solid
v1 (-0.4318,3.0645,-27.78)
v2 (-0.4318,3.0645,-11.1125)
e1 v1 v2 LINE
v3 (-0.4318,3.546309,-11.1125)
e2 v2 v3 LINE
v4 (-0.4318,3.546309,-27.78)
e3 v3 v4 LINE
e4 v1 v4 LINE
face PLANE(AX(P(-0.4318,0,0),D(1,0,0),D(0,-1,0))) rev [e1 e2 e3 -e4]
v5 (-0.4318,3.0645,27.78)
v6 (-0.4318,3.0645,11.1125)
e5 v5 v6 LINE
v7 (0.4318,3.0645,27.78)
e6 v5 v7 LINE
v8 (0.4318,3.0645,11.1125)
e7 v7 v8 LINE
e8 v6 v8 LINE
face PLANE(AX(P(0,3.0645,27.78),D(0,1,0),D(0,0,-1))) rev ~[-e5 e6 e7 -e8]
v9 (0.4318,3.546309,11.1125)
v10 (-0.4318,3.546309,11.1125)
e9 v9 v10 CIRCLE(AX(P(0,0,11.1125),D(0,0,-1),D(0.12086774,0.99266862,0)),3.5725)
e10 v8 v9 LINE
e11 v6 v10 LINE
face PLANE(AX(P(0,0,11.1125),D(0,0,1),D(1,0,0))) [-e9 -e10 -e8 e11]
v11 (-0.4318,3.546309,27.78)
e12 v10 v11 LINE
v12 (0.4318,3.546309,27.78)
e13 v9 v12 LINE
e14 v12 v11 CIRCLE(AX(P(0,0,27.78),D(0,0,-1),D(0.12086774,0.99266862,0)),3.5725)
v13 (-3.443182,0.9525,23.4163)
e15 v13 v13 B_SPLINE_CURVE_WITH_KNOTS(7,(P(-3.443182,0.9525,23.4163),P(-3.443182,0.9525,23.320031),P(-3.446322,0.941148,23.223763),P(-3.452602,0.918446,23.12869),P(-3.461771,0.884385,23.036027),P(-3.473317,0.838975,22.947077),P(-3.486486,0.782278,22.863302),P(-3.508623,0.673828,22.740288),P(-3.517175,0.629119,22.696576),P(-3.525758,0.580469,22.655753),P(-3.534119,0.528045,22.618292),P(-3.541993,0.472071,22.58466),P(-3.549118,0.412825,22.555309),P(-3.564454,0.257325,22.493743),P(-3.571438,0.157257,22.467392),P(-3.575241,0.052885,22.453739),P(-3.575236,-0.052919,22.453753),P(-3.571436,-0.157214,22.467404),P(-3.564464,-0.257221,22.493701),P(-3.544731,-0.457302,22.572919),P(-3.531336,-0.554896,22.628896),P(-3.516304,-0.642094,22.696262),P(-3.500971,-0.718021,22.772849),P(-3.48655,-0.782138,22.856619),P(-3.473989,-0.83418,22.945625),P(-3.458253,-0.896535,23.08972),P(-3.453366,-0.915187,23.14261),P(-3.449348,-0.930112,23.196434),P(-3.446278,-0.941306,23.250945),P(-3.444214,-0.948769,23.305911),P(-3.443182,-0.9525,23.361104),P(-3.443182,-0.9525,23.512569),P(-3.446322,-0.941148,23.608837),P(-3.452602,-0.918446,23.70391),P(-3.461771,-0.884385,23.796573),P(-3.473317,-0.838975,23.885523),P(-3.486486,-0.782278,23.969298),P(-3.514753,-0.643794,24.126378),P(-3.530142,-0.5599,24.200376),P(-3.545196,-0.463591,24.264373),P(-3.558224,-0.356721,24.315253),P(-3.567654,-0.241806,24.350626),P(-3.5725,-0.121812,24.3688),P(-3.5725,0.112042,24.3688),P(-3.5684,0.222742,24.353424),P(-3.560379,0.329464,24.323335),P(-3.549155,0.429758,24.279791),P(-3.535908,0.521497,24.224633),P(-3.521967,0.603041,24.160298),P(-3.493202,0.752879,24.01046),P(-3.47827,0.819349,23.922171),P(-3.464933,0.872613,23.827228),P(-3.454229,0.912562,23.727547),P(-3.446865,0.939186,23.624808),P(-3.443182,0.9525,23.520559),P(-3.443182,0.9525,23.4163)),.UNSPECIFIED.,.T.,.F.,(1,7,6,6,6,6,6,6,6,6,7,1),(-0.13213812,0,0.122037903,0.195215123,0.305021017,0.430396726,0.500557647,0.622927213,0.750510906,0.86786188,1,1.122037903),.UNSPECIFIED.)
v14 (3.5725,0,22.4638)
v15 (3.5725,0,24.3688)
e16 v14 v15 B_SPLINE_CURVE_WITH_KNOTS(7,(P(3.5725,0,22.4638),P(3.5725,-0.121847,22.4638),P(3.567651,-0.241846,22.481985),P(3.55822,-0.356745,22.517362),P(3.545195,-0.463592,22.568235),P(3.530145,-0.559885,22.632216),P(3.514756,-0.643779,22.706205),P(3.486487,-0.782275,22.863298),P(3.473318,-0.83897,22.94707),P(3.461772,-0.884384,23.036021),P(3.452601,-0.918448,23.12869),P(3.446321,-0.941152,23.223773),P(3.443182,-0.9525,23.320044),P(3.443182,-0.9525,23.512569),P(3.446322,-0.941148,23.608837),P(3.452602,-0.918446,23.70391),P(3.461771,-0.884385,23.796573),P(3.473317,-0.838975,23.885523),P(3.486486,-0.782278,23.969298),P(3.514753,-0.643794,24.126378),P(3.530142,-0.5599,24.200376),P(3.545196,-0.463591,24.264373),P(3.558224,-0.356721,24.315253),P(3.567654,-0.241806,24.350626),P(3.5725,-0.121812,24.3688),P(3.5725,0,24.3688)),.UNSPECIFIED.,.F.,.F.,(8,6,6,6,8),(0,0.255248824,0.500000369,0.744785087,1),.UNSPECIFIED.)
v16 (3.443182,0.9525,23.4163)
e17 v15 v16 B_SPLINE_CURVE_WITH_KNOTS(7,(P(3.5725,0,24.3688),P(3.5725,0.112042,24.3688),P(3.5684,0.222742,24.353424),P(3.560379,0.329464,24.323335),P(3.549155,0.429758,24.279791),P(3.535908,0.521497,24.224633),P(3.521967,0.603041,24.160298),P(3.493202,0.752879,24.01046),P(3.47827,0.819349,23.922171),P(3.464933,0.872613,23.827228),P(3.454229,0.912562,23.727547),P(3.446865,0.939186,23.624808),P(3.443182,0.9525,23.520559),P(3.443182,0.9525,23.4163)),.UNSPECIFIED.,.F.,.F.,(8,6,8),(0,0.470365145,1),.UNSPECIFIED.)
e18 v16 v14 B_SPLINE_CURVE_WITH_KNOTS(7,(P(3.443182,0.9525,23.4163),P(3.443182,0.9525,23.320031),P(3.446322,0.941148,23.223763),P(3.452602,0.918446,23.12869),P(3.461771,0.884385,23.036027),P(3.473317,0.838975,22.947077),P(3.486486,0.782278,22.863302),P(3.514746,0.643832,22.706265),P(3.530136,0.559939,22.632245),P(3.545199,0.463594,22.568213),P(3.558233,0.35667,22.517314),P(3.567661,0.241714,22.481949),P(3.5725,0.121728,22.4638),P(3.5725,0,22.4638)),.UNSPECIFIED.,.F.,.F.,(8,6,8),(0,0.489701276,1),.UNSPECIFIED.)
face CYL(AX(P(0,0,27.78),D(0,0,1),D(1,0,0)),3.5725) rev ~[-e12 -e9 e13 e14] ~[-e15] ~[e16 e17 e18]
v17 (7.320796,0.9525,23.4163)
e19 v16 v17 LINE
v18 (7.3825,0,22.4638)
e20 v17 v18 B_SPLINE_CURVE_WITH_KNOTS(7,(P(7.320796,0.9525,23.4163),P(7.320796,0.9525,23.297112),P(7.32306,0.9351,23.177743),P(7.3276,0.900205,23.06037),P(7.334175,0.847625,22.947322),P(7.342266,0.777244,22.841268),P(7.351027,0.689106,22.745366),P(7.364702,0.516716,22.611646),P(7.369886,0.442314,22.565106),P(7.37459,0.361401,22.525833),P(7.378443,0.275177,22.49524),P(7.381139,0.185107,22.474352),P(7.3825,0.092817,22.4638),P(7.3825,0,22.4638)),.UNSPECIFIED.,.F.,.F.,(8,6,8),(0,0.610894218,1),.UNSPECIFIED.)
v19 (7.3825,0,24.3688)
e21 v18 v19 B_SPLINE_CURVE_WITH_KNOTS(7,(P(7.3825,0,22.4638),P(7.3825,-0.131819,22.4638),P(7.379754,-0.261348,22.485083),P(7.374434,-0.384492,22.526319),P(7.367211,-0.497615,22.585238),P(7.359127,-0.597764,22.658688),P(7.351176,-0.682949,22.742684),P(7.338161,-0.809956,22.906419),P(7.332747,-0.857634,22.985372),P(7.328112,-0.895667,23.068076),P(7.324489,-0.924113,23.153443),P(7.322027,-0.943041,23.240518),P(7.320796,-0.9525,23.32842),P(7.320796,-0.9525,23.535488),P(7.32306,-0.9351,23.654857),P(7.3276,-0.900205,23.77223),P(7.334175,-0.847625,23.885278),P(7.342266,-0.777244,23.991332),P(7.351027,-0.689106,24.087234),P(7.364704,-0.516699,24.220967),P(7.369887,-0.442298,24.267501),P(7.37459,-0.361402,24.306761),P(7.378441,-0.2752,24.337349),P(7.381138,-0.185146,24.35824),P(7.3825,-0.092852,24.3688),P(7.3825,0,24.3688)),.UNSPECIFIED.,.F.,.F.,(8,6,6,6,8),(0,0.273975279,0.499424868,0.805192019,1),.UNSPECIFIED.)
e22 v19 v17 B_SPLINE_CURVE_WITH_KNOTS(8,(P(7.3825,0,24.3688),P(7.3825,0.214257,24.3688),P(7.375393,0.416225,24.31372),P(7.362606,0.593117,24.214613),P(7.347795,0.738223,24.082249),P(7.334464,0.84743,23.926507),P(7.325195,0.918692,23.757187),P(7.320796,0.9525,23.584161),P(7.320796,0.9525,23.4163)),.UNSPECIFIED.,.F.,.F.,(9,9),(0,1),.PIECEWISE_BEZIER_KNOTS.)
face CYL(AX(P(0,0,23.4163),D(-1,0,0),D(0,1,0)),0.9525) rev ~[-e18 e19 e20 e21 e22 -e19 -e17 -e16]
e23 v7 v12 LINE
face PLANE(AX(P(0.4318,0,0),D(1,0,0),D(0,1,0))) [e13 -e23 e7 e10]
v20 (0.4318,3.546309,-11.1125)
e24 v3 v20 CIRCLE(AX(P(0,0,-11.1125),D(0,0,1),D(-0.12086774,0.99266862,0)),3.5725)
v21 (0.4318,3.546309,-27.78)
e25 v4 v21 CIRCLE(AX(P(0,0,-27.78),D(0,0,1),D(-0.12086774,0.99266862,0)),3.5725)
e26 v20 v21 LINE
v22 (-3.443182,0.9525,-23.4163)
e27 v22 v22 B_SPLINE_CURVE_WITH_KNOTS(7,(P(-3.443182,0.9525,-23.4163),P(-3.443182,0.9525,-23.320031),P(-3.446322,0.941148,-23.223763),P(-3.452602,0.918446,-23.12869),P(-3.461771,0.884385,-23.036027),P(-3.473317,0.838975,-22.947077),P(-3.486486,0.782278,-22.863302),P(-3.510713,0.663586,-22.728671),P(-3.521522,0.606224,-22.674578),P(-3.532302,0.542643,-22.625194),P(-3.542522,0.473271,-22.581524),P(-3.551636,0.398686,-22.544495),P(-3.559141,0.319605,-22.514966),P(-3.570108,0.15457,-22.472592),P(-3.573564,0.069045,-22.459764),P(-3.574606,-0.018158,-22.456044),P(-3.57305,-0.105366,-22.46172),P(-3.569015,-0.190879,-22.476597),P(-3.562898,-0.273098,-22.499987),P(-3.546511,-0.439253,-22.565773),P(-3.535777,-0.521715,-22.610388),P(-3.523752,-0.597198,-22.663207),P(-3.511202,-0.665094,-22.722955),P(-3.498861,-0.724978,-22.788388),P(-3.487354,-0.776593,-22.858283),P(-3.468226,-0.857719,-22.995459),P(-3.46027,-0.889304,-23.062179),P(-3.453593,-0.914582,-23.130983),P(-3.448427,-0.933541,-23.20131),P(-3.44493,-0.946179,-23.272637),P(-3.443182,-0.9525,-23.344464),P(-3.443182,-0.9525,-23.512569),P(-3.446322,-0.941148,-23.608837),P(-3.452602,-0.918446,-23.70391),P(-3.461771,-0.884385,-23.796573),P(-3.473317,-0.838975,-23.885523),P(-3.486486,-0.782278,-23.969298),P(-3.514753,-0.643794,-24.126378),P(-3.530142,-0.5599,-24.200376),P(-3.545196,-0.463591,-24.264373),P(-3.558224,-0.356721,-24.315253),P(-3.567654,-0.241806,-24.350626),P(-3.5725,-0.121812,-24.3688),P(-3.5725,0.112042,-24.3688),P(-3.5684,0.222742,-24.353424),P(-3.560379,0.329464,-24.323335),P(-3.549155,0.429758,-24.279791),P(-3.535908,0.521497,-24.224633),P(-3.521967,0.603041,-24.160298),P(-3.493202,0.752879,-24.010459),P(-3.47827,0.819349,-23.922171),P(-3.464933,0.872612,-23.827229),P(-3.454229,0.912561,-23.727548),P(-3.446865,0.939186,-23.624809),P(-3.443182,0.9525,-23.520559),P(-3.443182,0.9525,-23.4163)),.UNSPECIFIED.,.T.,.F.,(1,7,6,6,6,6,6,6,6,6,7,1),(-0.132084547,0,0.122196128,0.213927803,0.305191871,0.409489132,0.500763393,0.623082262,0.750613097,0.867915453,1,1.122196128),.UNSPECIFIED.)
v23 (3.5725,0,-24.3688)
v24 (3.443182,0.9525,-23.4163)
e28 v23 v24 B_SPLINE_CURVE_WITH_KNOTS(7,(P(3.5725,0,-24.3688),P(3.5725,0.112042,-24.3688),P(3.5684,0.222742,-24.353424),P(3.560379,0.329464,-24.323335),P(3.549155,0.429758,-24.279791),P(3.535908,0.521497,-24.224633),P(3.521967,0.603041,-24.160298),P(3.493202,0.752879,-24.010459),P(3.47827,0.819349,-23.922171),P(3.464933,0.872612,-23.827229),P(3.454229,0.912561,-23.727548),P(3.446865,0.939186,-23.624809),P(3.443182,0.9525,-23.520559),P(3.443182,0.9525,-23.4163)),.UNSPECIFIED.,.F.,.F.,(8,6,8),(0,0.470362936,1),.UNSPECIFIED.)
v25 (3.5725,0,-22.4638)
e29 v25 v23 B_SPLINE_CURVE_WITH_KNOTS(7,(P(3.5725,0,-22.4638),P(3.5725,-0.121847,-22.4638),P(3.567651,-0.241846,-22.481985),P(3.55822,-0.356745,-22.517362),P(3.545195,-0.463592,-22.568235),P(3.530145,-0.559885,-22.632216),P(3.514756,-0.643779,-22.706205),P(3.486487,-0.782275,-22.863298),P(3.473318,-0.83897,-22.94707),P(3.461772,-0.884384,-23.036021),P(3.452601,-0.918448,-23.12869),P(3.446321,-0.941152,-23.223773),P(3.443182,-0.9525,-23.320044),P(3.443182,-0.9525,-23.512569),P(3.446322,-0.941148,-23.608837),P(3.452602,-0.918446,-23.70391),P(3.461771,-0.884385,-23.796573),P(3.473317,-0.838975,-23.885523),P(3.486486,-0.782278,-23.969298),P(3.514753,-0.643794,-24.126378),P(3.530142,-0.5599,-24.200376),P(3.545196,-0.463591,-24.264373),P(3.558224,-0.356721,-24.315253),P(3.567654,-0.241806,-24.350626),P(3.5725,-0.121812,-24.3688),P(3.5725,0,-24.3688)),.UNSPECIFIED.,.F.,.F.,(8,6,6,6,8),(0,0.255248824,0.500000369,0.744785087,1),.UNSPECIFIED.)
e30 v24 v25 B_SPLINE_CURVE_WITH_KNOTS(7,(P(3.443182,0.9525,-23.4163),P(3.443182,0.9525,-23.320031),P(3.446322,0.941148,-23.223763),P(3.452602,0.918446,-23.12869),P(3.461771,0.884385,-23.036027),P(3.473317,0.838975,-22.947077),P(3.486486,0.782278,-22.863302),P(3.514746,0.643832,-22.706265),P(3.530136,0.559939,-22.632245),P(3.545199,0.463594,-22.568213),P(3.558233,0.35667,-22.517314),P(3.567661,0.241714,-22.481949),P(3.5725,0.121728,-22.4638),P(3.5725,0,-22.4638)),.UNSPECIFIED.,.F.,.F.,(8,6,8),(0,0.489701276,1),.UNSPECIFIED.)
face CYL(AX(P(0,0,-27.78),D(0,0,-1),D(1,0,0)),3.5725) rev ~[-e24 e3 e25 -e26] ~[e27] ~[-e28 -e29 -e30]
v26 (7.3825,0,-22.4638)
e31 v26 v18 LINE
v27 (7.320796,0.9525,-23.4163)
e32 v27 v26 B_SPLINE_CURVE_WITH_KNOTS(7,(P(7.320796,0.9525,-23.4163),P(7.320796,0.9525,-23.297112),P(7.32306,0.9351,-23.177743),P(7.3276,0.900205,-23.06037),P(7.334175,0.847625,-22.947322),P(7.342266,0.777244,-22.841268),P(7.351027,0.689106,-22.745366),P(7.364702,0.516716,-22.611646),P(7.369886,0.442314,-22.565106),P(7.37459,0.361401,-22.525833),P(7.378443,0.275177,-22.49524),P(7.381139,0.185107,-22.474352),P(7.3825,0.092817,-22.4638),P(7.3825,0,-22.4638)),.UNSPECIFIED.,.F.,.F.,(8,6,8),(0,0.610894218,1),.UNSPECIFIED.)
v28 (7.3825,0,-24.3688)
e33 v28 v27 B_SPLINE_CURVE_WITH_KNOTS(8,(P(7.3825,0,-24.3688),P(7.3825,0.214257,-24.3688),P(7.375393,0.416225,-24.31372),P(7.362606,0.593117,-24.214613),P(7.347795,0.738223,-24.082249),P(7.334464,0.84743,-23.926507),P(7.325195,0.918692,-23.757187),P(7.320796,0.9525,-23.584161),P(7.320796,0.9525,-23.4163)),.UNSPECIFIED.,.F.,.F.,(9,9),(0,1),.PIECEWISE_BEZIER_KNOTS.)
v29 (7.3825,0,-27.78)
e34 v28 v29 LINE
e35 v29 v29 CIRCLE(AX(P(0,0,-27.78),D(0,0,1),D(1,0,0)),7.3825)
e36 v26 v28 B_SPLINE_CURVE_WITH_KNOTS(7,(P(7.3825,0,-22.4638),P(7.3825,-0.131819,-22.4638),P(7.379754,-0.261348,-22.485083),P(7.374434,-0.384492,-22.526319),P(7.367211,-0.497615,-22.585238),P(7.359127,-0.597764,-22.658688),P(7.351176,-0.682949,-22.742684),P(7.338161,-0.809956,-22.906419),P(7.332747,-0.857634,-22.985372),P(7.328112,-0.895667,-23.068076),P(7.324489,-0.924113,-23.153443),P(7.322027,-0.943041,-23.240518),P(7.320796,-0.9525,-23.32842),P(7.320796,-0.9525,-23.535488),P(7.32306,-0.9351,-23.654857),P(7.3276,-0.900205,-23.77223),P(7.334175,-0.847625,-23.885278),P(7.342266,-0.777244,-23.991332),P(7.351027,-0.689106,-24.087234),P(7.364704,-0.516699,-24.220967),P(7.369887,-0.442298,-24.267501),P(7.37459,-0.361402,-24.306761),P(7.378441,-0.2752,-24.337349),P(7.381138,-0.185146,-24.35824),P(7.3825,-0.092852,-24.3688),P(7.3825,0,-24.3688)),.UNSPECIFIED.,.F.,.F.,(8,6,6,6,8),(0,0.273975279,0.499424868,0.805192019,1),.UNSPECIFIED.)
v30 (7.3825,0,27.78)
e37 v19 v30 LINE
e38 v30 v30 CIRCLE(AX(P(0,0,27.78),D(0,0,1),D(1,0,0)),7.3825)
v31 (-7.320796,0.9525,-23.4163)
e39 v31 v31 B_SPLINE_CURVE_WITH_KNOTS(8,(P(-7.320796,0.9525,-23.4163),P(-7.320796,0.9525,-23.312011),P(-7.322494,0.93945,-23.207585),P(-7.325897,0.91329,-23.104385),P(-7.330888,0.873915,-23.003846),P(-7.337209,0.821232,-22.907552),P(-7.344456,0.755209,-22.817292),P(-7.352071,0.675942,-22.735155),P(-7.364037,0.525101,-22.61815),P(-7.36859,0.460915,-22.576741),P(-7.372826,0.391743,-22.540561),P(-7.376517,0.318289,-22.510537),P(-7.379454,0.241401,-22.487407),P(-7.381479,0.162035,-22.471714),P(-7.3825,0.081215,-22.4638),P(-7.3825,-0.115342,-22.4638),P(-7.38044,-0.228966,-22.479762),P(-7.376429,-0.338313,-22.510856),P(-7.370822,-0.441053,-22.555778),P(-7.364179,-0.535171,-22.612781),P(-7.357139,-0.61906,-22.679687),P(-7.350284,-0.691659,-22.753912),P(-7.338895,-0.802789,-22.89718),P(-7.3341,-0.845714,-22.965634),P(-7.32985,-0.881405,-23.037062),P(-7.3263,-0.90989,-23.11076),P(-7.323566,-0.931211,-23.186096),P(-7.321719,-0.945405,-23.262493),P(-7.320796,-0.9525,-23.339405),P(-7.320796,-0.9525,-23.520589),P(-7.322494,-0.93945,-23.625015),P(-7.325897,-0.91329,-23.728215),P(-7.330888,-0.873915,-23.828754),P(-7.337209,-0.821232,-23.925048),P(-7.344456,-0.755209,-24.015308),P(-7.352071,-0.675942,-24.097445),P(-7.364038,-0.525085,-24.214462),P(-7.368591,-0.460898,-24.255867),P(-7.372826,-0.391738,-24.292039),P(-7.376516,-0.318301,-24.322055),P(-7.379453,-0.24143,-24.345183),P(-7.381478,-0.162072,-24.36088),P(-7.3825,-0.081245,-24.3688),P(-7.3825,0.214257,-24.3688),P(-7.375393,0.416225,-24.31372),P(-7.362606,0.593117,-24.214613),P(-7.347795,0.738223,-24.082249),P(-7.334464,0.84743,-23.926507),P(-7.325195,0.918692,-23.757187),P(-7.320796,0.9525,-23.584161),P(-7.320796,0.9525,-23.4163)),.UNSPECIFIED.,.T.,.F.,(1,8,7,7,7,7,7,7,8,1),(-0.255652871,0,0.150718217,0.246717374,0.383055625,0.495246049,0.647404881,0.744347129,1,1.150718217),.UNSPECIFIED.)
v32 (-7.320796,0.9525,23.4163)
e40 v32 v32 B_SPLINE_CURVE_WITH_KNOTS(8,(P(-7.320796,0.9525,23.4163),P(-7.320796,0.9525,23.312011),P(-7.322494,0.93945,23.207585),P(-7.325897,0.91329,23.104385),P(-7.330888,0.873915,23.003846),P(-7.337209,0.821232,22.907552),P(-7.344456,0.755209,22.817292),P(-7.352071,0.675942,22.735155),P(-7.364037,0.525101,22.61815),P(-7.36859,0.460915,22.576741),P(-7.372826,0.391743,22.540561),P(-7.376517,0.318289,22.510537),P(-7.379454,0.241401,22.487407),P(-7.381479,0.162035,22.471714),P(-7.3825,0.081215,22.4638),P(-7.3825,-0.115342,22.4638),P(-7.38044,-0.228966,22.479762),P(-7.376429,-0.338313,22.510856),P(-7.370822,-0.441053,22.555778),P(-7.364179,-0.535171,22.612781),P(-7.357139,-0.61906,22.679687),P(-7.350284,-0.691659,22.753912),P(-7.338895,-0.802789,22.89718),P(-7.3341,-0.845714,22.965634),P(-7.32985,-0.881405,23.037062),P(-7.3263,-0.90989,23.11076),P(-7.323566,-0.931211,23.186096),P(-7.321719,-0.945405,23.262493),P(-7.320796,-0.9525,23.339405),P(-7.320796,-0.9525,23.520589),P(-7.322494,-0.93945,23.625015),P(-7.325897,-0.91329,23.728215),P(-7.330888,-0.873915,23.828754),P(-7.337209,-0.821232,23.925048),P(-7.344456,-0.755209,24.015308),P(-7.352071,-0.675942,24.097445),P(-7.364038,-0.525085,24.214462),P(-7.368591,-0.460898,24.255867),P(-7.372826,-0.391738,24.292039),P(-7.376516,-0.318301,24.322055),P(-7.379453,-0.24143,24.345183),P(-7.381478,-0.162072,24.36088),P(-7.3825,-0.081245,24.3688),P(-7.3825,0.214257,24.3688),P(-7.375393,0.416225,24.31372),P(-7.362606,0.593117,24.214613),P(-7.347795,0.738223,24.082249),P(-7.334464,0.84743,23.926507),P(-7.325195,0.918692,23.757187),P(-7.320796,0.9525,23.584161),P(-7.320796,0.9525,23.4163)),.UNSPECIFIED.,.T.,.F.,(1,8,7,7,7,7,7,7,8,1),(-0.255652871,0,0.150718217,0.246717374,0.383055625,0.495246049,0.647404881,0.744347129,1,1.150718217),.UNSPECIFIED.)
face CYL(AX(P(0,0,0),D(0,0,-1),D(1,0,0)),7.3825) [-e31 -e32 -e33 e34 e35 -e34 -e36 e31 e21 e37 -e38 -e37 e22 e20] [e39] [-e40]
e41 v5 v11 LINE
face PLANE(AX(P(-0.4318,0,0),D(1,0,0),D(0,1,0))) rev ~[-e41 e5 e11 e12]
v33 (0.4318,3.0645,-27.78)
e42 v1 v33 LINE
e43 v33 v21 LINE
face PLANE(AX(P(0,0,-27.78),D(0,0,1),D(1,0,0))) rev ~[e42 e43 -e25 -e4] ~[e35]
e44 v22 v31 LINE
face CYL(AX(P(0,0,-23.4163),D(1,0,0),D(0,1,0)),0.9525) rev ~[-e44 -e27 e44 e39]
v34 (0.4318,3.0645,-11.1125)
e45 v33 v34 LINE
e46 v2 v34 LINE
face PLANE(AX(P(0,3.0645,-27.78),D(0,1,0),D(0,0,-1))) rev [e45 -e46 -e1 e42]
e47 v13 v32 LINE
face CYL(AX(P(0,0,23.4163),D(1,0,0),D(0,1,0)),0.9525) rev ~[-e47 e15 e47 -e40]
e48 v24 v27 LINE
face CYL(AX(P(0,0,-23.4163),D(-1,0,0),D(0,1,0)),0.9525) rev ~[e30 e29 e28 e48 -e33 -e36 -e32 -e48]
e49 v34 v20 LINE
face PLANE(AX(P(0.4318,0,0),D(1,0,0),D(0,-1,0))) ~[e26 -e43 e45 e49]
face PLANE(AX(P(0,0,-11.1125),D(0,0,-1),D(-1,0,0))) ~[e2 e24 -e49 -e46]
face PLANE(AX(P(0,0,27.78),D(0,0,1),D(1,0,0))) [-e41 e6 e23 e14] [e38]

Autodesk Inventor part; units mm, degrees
ref_plane "YZ Plane" through (0, 0, 0) normal (1, 0, 0) x (0, 1, 0)
ref_plane "XZ Plane" through (0, 0, 0) normal (0, 1, 0) x (-1, 0, 0)
ref_plane "XY Plane" through (0, 0, 0) normal (0, 0, 1) x (1, 0, 0)
sketch "Sketch1" plane through (0, 0, 0) normal (0, 0, 1) x (1, 0, 0)
  circle A0 centre (0, 0) radius 7.3825
  dimension "d0" = 14.765
extrude "Extrusion1" add sketch "Sketch1" along normal mid plane 55.56
sketch "Sketch3" plane through (0, 0, 27.78) normal (0, 0, 1) x (1, 0, 0)
  circle A0 centre (0, 0) radius 3.5725
  dimension "d6" = 7.145
extrude "Extrusion2" cut sketch "Sketch3" against normal blind 16.6675
sketch "Sketch4" plane through (0, 0, 0) normal (1, 0, 0) x (0, 1, 0)
  circle A0 centre (0, -23.4163) radius 0.9525
  point P0 (0, 0)
  dimension "d9" = 23.4163
  dimension "d10" = 1.905
extrude "Extrusion3" cut sketch "Sketch4" along normal through all both and the other way through all
sketch "Sketch6" plane through (0, 0, 0) normal (1, 0, 0) x (0, 1, 0)
  line L0 (-3.5725, 27.78) -> (3.5725, 27.78) projected
  line L1 (-3.5725, 11.1125) -> (3.5725, 11.1125) projected
  line L2 (3.5725, 27.78) -> (3.0645, 27.78)
  line L3 (3.0645, 27.78) -> (3.0645, 11.1125)
  line L4 (3.0645, 11.1125) -> (3.5725, 11.1125)
  line L5 (3.5725, 11.1125) -> (3.5725, 27.78)
  point P0 (0, 0)
  dimension "d17" = 0.508
extrude "Extrusion5" add sketch "Sketch6" along normal mid plane 0.8636
mirror "Mirror5" about plane through (0, 0, 0) normal (0, 0, 1) of "Extrusion5", "Extrusion3", "Extrusion2"
properties part number "Wheel_axis_3DPrint"
